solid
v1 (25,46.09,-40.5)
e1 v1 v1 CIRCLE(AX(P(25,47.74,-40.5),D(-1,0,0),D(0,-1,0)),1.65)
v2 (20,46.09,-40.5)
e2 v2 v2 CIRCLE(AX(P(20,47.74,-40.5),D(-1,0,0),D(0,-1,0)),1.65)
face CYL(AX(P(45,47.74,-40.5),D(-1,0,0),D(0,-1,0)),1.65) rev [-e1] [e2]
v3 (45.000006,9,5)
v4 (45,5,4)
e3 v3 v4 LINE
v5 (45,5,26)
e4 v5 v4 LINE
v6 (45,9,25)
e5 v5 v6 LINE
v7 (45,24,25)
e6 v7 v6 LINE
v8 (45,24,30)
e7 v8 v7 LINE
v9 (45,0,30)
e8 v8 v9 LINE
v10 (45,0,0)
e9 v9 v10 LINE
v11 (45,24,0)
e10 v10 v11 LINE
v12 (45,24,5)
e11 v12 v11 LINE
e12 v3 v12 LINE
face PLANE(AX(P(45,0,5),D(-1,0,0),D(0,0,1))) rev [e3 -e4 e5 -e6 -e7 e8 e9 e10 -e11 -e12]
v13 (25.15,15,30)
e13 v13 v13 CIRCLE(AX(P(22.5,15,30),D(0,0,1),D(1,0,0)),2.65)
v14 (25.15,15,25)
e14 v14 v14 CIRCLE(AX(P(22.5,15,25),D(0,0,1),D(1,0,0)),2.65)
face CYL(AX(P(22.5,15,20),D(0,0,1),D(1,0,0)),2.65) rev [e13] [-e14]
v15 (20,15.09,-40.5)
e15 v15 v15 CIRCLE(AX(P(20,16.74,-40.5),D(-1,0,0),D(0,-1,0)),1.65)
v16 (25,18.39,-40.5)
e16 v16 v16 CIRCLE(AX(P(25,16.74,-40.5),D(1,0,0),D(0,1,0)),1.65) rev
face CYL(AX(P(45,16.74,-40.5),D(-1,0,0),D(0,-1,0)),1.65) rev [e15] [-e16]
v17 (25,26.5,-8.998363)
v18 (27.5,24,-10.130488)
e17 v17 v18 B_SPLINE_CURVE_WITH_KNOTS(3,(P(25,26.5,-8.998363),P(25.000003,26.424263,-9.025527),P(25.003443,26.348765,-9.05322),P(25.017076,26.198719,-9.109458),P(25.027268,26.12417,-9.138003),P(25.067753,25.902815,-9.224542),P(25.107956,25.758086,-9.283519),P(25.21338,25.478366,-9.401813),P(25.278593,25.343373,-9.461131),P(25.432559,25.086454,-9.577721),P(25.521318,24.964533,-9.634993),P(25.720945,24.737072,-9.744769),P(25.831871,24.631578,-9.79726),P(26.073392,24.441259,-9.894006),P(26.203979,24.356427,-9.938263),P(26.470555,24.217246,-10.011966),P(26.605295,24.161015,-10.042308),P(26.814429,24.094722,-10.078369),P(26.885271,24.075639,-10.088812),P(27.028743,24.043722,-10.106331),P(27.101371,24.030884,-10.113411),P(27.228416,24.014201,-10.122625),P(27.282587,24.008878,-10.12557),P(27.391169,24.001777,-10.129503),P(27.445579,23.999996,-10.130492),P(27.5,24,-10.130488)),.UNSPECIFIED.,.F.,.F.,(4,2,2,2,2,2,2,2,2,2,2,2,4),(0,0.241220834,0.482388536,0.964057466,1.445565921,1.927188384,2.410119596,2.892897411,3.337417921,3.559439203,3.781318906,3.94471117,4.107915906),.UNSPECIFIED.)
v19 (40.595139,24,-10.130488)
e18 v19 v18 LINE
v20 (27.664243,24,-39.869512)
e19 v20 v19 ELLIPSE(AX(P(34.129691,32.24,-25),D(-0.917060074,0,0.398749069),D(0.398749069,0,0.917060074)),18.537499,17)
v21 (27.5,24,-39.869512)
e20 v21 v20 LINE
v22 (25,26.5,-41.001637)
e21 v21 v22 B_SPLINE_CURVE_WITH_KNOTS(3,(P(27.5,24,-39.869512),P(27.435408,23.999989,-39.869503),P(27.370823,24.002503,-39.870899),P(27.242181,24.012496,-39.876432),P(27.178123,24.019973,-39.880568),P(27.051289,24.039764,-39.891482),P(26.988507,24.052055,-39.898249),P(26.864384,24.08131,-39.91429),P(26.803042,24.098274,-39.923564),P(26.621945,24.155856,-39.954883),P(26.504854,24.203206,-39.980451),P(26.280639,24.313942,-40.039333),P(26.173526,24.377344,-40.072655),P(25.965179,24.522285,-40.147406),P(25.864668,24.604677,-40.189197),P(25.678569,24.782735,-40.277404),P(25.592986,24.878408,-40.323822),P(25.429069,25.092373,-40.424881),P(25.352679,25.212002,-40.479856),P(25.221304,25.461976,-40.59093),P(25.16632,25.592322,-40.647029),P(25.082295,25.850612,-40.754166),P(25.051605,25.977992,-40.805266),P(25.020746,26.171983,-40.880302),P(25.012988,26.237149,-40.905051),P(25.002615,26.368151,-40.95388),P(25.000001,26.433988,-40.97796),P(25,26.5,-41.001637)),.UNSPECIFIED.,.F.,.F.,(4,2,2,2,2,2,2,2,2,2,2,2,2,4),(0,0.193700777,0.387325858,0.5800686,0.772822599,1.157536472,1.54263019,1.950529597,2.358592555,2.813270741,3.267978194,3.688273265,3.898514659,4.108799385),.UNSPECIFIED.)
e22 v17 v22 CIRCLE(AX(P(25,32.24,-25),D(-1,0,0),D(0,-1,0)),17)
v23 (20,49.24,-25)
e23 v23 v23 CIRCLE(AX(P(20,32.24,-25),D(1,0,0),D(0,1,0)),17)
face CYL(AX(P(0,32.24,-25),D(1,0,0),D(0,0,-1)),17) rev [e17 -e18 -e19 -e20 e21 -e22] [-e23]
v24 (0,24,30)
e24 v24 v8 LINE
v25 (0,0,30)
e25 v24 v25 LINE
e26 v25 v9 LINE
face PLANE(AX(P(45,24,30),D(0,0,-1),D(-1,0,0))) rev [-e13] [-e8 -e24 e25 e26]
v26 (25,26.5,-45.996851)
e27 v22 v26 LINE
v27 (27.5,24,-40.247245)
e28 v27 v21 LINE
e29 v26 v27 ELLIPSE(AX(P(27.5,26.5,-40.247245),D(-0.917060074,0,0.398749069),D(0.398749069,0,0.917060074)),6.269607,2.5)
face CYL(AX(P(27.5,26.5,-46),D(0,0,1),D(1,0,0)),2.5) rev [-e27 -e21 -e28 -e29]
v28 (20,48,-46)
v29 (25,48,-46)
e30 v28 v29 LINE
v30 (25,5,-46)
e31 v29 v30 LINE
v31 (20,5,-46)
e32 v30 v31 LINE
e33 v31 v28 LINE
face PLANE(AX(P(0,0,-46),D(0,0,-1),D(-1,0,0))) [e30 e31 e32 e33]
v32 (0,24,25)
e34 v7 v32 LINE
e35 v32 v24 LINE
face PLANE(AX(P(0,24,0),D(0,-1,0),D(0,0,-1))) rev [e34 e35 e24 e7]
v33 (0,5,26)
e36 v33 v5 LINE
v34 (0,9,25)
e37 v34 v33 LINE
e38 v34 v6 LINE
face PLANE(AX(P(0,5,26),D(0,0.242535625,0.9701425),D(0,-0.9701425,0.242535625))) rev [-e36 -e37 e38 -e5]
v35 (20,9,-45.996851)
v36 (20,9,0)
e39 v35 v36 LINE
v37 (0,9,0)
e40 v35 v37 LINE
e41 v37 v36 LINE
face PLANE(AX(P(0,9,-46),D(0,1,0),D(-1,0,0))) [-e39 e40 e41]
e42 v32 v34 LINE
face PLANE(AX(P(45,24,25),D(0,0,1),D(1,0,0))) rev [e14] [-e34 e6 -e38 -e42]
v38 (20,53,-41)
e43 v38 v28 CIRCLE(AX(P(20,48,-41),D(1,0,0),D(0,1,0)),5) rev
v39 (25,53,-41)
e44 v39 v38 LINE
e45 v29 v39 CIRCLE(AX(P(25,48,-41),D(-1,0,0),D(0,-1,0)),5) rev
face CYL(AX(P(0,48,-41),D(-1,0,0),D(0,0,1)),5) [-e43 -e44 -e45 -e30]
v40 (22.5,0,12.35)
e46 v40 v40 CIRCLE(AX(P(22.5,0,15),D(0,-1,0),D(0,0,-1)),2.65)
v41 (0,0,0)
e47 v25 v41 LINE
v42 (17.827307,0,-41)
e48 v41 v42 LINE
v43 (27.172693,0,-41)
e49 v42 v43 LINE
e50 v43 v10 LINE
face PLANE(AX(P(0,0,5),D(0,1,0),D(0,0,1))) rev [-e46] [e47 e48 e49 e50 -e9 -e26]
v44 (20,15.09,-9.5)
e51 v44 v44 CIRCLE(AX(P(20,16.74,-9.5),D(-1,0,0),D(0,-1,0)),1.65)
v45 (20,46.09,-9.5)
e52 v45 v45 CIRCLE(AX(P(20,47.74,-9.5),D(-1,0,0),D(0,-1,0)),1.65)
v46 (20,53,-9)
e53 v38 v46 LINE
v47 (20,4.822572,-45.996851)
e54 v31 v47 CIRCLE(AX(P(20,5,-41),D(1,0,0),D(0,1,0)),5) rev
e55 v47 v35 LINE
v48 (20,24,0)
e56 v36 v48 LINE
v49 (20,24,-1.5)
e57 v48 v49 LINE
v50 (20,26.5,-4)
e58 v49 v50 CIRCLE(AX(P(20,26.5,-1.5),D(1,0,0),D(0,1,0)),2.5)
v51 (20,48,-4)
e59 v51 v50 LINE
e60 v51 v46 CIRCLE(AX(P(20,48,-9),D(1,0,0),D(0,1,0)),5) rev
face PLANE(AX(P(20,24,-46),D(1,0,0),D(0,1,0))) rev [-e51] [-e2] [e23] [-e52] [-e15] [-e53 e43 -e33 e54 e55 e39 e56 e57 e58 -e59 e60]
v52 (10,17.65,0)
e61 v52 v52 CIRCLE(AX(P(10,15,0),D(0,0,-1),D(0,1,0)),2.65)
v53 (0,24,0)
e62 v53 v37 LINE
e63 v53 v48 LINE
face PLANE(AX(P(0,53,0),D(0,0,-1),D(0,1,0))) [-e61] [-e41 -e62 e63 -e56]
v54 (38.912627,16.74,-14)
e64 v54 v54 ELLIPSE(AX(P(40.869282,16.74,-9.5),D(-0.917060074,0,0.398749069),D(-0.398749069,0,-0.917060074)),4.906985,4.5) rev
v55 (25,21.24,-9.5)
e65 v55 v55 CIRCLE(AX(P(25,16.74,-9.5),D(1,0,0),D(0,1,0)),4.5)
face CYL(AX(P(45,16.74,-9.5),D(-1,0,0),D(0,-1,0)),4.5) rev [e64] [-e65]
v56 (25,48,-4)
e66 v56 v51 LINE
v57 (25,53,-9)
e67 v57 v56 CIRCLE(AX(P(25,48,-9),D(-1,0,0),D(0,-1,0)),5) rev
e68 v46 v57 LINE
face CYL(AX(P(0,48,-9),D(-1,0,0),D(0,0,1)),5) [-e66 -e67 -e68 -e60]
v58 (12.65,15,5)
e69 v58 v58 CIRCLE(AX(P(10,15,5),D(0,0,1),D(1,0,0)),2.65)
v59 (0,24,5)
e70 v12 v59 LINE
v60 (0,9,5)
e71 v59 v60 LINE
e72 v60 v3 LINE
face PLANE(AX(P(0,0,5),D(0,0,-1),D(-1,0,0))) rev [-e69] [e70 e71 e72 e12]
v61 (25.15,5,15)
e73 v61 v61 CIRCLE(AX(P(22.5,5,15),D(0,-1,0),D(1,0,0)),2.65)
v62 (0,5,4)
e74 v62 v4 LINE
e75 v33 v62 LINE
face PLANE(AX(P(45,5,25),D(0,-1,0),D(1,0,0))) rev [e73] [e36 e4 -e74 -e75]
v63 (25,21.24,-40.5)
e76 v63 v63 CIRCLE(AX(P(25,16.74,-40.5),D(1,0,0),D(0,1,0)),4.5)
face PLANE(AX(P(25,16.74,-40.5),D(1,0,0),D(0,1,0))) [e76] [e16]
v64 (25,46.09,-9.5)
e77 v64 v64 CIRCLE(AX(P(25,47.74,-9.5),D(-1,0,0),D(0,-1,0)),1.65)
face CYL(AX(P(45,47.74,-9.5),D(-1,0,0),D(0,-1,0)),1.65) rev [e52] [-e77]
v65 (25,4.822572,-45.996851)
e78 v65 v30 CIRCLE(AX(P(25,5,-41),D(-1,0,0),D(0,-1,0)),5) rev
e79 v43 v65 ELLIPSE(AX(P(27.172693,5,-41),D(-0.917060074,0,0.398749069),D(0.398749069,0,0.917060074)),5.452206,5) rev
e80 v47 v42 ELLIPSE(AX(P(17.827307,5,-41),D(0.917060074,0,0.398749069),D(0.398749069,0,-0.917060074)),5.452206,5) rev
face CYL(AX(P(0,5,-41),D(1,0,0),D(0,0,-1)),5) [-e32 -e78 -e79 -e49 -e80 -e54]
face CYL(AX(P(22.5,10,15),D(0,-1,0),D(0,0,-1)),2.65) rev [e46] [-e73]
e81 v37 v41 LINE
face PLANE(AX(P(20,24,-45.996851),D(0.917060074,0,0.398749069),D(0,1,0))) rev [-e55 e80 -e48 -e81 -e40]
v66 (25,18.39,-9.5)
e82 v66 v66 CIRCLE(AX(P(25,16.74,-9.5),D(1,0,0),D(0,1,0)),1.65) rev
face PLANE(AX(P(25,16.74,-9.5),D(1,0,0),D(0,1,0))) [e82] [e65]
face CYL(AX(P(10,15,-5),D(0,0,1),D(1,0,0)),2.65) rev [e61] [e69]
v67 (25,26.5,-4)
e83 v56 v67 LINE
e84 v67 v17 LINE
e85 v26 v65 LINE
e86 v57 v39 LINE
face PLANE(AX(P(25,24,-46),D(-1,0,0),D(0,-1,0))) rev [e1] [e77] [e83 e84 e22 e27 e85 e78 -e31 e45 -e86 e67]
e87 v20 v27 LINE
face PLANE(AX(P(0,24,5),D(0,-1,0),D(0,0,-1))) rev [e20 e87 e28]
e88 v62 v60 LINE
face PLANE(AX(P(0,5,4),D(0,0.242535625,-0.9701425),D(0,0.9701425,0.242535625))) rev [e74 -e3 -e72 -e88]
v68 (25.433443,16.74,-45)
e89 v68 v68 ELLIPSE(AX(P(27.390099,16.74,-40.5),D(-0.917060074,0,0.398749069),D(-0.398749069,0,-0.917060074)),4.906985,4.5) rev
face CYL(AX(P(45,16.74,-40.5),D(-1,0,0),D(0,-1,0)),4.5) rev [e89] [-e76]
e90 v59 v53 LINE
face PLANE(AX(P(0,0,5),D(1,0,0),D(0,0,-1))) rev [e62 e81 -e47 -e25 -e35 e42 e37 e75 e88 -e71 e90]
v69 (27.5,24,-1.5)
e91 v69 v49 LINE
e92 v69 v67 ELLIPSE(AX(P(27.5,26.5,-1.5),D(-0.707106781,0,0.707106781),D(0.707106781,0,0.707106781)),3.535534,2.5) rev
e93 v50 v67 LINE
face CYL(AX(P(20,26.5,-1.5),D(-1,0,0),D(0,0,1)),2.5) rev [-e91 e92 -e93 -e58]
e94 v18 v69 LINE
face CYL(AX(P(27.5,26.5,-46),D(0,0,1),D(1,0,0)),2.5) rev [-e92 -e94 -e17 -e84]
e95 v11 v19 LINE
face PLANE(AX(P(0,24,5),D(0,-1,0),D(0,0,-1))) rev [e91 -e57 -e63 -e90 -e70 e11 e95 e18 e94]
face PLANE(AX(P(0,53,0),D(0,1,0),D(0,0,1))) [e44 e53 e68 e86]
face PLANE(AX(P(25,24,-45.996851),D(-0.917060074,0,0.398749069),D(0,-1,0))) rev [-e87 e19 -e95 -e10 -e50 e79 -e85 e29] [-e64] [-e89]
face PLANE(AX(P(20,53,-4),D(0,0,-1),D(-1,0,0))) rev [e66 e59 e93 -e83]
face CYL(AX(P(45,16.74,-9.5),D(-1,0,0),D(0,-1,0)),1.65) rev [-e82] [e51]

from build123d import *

# Parameters (mm, degrees)
SKETCH1_W               = 45
SKETCH1_H               = 24
BOSS_EXTRUDE1_DEPTH     = 5
SKETCH2_W               = 5
SKETCH2_H               = 24
BOSS_EXTRUDE2_DEPTH     = 46
SKETCH3_W               = 45
SKETCH3_H               = 5
BOSS_EXTRUDE3_DEPTH     = 20
CHAMFER2_SIZE           = 45.996850945
CHAMFER2_SIZE_2         = 20
CHAMFER3_SIZE2          = 45.996850945
CHAMFER3_SIZE           = 20
SKETCH4_W               = 5
SKETCH4_H               = 42
BOSS_EXTRUDE4_DEPTH     = 29
CUT_EXTRUDE1_DEPTH      = 75.498322129
CUT_EXTRUDE1_DEPTH_BACK = 75.498322129
SKETCH6_R               = 17
SKETCH7_W               = 46
SKETCH7_H               = 44
CUT_EXTRUDE2_DEPTH      = 75.498322129
SKETCH8_R               = 1.65
CUT_EXTRUDE3_DEPTH      = 75.498322129
SKETCH9_R               = 4.5
CUT_EXTRUDE4_DEPTH      = 75.498322129
FILLET1_R               = 5
SKETCH10_R              = 2.65
CUT_EXTRUDE5_DEPTH      = 10
SKETCH11_R              = 2.65
CUT_EXTRUDE6_DEPTH      = 10
SKETCH12_W              = 45
SKETCH12_H              = 5
BOSS_EXTRUDE5_DEPTH     = 24
SKETCH13_R              = 2.65
CUT_EXTRUDE7_DEPTH      = 10
CUT_EXTRUDE8_DEPTH      = 84.366660003
CUT_EXTRUDE8_DEPTH_BACK = 84.366660003
FILLET2_R               = 2.5


# Some blends are built 0.0001 mm under size
with BuildPart() as part:
    # Sketch1 → Boss-Extrude1 (new body)
    with BuildSketch(Plane.XY):
        with Locations((22.5, 12)):
            Rectangle(SKETCH1_W, SKETCH1_H)
    extrude(amount=BOSS_EXTRUDE1_DEPTH)

    # Sketch2 → Boss-Extrude2 (add)
    with BuildSketch(Plane(origin=(0, 0, 0), x_dir=(-1, 0, 0), z_dir=(0, 0, -1))):
        with Locations((-22.5, 12)):
            Rectangle(SKETCH2_W, SKETCH2_H)
    extrude(amount=BOSS_EXTRUDE2_DEPTH)

    # Sketch3 → Boss-Extrude3 (add)
    with BuildSketch(Plane.XY.offset(5)):
        with Locations((22.5, 2.5)):
            Rectangle(SKETCH3_W, SKETCH3_H)
    extrude(amount=BOSS_EXTRUDE3_DEPTH)

    # Chamfer2
    # the kernel refuses this chamfer: 45.996850945, 20 mm, written as the material it adds along each edge
    with BuildSketch(Plane(origin=(25, 0, 0), x_dir=(-0.015383761930769691, 0, -0.9998816629325978), z_dir=(0, 1, 0))) as chamfer2_piece_1_section:
        Polygon((CHAMFER2_SIZE * 0.999881662927, -CHAMFER2_SIZE * 0.0153837619307), (-CHAMFER2_SIZE_2 * 0.0153837619308, -CHAMFER2_SIZE_2 * 0.999881662933), (0, 0), align=None)
    chamfer2_piece_1 = extrude(amount=24, mode=Mode.PRIVATE)
    chamfer2_piece_1 = split(chamfer2_piece_1, bisect_by=Plane(origin=(45, 12, -15.645189054), z_dir=(-1, 0, 0)), keep=Keep.TOP, mode=Mode.PRIVATE)
    add(chamfer2_piece_1)

    # Chamfer3
    chamfer3_edges = [part.edges().sort_by_distance(p)[0] for p in [
        (20, 12, 0),
    ]]
    chamfer3_side = [part.faces().sort_by_distance(p)[0] for p in [
        (19.6, 12, 0),
    ]]
    chamfer(chamfer3_edges, length=CHAMFER3_SIZE - 0.0001, length2=CHAMFER3_SIZE2 - 0.0001, reference=chamfer3_side[0])  # a hair under: the kernel refuses the full size

    # Sketch4 → Boss-Extrude4 (add)
    with BuildSketch(Plane(origin=(0, 24, 0), x_dir=(1, 0, 0), z_dir=(0, 1, 0))):
        with Locations((22.5, 25)):
            Rectangle(SKETCH4_W, SKETCH4_H)
    extrude(amount=BOSS_EXTRUDE4_DEPTH)

    # Sketch6 → Cut-Extrude1 (cut, two sides: drawn at the far end of the back side and taken through both)
    with BuildSketch(Plane(origin=(25, 0, 0), x_dir=(0, 0, -1), z_dir=(1, 0, 0)).offset(-CUT_EXTRUDE1_DEPTH_BACK)):
        with Locations(Location((25, 32.24, 0), (0, 0, 331.00679558))):
            Circle(SKETCH6_R)
    extrude(amount=CUT_EXTRUDE1_DEPTH + CUT_EXTRUDE1_DEPTH_BACK, mode=Mode.SUBTRACT)

    # Sketch7 → Cut-Extrude2 (cut, through all)
    with BuildSketch(Plane.ZY.offset(-20)):
        with Locations((-23, 31)):
            Rectangle(SKETCH7_W, SKETCH7_H)
    extrude(amount=CUT_EXTRUDE2_DEPTH, mode=Mode.SUBTRACT)

    # Sketch8 → Cut-Extrude3 (cut, through all)
    with BuildSketch(Plane.ZY.offset(-20)):
        with Locations(Location((-40.5, 47.74, 0), (0, 0, 270))):
            Circle(SKETCH8_R)
        with Locations(Location((-9.5, 47.74, 0), (0, 0, 270))):
            Circle(SKETCH8_R)
        with Locations(Location((-9.5, 16.74, 0), (0, 0, 270))):
            Circle(SKETCH8_R)
        with Locations(Location((-40.5, 16.74, 0), (0, 0, 270))):
            Circle(SKETCH8_R)
    extrude(amount=-CUT_EXTRUDE3_DEPTH, mode=Mode.SUBTRACT)

    # Sketch9 → Cut-Extrude4 (cut, through all)
    with BuildSketch(Plane(origin=(25, 0, 0), x_dir=(0, 0, -1), z_dir=(1, 0, 0))):
        with Locations((9.5, 16.74)):
            Circle(SKETCH9_R)
        with Locations((40.5, 16.74)):
            Circle(SKETCH9_R)
    extrude(amount=CUT_EXTRUDE4_DEPTH, mode=Mode.SUBTRACT)

    # Fillet1
    fillet1_edges = [part.edges().sort_by_distance(p)[0] for p in [
        (22.5, 0, -46),
        (22.5, 53, -4),
        (22.5, 53, -46),
    ]]
    fillet(fillet1_edges, radius=FILLET1_R)

    # Sketch10 → Cut-Extrude5 (cut)
    with BuildSketch(Plane.XZ):
        with Locations(Location((22.5, 15, 0), (0, 0, 270))):
            Circle(SKETCH10_R)
    extrude(amount=-CUT_EXTRUDE5_DEPTH, mode=Mode.SUBTRACT)

    # Sketch11 → Cut-Extrude6 (cut)
    with BuildSketch(Plane.XY.offset(5)):
        with Locations((10, 15)):
            Circle(SKETCH11_R)
    extrude(amount=-CUT_EXTRUDE6_DEPTH, mode=Mode.SUBTRACT)

    # Sketch12 → Boss-Extrude5 (add)
    with BuildSketch(Plane(origin=(0, 0, 0), x_dir=(1, 0, 0), z_dir=(0, 1, 0))):
        with Locations((22.5, -27.5)):
            Rectangle(SKETCH12_W, SKETCH12_H)
    extrude(amount=BOSS_EXTRUDE5_DEPTH)

    # Sketch13 → Cut-Extrude7 (cut)
    with BuildSketch(Plane.XY.offset(30)):
        with Locations((22.5, 15)):
            Circle(SKETCH13_R)
    extrude(amount=-CUT_EXTRUDE7_DEPTH, mode=Mode.SUBTRACT)

    # Sketch14 → Cut-Extrude8 (cut, two sides: drawn at the far end of the back side and taken through both)
    with BuildSketch(Plane(origin=(45, 0, 0), x_dir=(0, 0, -1), z_dir=(1, 0, 0)).offset(-CUT_EXTRUDE8_DEPTH_BACK)):
        Polygon((-25, 5), (-26, 5), (-25, 9), align=None)
        Polygon((-5, 5), (-4, 5), (-5, 9), align=None)
    extrude(amount=CUT_EXTRUDE8_DEPTH + CUT_EXTRUDE8_DEPTH_BACK, mode=Mode.SUBTRACT)

    # Fillet2
    # the kernel refuses this fillet: 2.5 mm, written as the material it adds along each edge
    with BuildSketch(Plane(origin=(25, 24, -4), x_dir=(0, 0, 1), z_dir=(-1, 0, 0))) as fillet2_piece_1:
        with BuildLine():
            CenterArc((FILLET2_R, FILLET2_R), FILLET2_R, 180, 90)
            Line((0, FILLET2_R), (0, 0))
            Line((0, 0), (FILLET2_R, 0))
        make_face()
    extrude(amount=5)
    with BuildSketch(Plane(origin=(25, 24, -16.380487567), x_dir=(1, 0, 0), z_dir=(0, 0, 1))) as fillet2_piece_2_section:
        with BuildLine():
            CenterArc((FILLET2_R, FILLET2_R), FILLET2_R, 180, 90)
            Line((0, FILLET2_R), (0, 0))
            Line((0, 0), (FILLET2_R, 0))
        make_face()
    fillet2_piece_2 = extrude(amount=12.380487567, mode=Mode.PRIVATE)
    fillet2_piece_2 = fillet2_piece_2 - Plane(origin=(25.580464588, 32.24, -25), x_dir=(0, -0.48470588235146506, -0.8746772019516044), z_dir=(1, 0, 0)) * Cylinder(17, 35, mode=Mode.PRIVATE)
    add(fillet2_piece_2)
    with BuildSketch(Plane(origin=(25, 24, -52.246850945), x_dir=(0, 1, 0), z_dir=(0, 0, 1))) as fillet2_piece_3_section:
        with BuildLine():
            CenterArc((FILLET2_R, -FILLET2_R), FILLET2_R, 90, 90)
            Line((0, -FILLET2_R), (0, 0))
            Line((0, 0), (FILLET2_R, 0))
        make_face()
    fillet2_piece_3 = extrude(amount=18.627338512, mode=Mode.PRIVATE)
    fillet2_piece_3 = split(fillet2_piece_3, bisect_by=Plane(origin=(25.437853411, 24.621520757, -46), z_dir=(0, 0, 1)), keep=Keep.TOP, mode=Mode.PRIVATE)
    fillet2_piece_3 = split(fillet2_piece_3, bisect_by=Plane(origin=(26.31729653, 24.621520757, -42.967276338), z_dir=(-0.9170600743850381, 0, 0.398749068925444)), keep=Keep.TOP, mode=Mode.PRIVATE)
    fillet2_piece_3 = fillet2_piece_3 - Plane(origin=(25.437853411, 32.24, -25), x_dir=(0, -0.48470588235146506, -0.8746772019516044), z_dir=(1, 0, 0)) * Cylinder(17, 48, mode=Mode.PRIVATE)
    add(fillet2_piece_3)
    with BuildSketch(Plane(origin=(25, 24, -16.380487567), x_dir=(1, 0, 0), z_dir=(0, 0, 1))) as fillet2_piece_4a_section:
        with BuildLine():
            CenterArc((FILLET2_R, FILLET2_R), FILLET2_R, 180, 90)
            Line((0, FILLET2_R), (0, 0))
            Line((0, 0), (FILLET2_R, 0))
        make_face()
    fillet2_piece_4a = extrude(amount=18.630487567, mode=Mode.PRIVATE)
    fillet2_piece_4a = split(fillet2_piece_4a, bisect_by=Plane(origin=(25.565987786, 24.565987786, -4), z_dir=(0, 0, 1)), keep=Keep.TOP, mode=Mode.PRIVATE)
    with BuildSketch(Plane(origin=(31.25, 24, -4), x_dir=(0, 0, 1), z_dir=(-1, 0, 0))) as fillet2_piece_4b_section:
        with BuildLine():
            CenterArc((FILLET2_R, FILLET2_R), FILLET2_R, 180, 90)
            Line((0, FILLET2_R), (0, 0))
            Line((0, 0), (FILLET2_R, 0))
        make_face()
    fillet2_piece_4b = extrude(amount=11.25, mode=Mode.PRIVATE)
    fillet2_piece_4b = split(fillet2_piece_4b, bisect_by=Plane(origin=(25, 24.565987786, -3.434012214), z_dir=(1, 0, 0)), keep=Keep.TOP, mode=Mode.PRIVATE)
    fillet2_piece_4 = fillet2_piece_4a & fillet2_piece_4b
    add(fillet2_piece_4)


solid = part.part
